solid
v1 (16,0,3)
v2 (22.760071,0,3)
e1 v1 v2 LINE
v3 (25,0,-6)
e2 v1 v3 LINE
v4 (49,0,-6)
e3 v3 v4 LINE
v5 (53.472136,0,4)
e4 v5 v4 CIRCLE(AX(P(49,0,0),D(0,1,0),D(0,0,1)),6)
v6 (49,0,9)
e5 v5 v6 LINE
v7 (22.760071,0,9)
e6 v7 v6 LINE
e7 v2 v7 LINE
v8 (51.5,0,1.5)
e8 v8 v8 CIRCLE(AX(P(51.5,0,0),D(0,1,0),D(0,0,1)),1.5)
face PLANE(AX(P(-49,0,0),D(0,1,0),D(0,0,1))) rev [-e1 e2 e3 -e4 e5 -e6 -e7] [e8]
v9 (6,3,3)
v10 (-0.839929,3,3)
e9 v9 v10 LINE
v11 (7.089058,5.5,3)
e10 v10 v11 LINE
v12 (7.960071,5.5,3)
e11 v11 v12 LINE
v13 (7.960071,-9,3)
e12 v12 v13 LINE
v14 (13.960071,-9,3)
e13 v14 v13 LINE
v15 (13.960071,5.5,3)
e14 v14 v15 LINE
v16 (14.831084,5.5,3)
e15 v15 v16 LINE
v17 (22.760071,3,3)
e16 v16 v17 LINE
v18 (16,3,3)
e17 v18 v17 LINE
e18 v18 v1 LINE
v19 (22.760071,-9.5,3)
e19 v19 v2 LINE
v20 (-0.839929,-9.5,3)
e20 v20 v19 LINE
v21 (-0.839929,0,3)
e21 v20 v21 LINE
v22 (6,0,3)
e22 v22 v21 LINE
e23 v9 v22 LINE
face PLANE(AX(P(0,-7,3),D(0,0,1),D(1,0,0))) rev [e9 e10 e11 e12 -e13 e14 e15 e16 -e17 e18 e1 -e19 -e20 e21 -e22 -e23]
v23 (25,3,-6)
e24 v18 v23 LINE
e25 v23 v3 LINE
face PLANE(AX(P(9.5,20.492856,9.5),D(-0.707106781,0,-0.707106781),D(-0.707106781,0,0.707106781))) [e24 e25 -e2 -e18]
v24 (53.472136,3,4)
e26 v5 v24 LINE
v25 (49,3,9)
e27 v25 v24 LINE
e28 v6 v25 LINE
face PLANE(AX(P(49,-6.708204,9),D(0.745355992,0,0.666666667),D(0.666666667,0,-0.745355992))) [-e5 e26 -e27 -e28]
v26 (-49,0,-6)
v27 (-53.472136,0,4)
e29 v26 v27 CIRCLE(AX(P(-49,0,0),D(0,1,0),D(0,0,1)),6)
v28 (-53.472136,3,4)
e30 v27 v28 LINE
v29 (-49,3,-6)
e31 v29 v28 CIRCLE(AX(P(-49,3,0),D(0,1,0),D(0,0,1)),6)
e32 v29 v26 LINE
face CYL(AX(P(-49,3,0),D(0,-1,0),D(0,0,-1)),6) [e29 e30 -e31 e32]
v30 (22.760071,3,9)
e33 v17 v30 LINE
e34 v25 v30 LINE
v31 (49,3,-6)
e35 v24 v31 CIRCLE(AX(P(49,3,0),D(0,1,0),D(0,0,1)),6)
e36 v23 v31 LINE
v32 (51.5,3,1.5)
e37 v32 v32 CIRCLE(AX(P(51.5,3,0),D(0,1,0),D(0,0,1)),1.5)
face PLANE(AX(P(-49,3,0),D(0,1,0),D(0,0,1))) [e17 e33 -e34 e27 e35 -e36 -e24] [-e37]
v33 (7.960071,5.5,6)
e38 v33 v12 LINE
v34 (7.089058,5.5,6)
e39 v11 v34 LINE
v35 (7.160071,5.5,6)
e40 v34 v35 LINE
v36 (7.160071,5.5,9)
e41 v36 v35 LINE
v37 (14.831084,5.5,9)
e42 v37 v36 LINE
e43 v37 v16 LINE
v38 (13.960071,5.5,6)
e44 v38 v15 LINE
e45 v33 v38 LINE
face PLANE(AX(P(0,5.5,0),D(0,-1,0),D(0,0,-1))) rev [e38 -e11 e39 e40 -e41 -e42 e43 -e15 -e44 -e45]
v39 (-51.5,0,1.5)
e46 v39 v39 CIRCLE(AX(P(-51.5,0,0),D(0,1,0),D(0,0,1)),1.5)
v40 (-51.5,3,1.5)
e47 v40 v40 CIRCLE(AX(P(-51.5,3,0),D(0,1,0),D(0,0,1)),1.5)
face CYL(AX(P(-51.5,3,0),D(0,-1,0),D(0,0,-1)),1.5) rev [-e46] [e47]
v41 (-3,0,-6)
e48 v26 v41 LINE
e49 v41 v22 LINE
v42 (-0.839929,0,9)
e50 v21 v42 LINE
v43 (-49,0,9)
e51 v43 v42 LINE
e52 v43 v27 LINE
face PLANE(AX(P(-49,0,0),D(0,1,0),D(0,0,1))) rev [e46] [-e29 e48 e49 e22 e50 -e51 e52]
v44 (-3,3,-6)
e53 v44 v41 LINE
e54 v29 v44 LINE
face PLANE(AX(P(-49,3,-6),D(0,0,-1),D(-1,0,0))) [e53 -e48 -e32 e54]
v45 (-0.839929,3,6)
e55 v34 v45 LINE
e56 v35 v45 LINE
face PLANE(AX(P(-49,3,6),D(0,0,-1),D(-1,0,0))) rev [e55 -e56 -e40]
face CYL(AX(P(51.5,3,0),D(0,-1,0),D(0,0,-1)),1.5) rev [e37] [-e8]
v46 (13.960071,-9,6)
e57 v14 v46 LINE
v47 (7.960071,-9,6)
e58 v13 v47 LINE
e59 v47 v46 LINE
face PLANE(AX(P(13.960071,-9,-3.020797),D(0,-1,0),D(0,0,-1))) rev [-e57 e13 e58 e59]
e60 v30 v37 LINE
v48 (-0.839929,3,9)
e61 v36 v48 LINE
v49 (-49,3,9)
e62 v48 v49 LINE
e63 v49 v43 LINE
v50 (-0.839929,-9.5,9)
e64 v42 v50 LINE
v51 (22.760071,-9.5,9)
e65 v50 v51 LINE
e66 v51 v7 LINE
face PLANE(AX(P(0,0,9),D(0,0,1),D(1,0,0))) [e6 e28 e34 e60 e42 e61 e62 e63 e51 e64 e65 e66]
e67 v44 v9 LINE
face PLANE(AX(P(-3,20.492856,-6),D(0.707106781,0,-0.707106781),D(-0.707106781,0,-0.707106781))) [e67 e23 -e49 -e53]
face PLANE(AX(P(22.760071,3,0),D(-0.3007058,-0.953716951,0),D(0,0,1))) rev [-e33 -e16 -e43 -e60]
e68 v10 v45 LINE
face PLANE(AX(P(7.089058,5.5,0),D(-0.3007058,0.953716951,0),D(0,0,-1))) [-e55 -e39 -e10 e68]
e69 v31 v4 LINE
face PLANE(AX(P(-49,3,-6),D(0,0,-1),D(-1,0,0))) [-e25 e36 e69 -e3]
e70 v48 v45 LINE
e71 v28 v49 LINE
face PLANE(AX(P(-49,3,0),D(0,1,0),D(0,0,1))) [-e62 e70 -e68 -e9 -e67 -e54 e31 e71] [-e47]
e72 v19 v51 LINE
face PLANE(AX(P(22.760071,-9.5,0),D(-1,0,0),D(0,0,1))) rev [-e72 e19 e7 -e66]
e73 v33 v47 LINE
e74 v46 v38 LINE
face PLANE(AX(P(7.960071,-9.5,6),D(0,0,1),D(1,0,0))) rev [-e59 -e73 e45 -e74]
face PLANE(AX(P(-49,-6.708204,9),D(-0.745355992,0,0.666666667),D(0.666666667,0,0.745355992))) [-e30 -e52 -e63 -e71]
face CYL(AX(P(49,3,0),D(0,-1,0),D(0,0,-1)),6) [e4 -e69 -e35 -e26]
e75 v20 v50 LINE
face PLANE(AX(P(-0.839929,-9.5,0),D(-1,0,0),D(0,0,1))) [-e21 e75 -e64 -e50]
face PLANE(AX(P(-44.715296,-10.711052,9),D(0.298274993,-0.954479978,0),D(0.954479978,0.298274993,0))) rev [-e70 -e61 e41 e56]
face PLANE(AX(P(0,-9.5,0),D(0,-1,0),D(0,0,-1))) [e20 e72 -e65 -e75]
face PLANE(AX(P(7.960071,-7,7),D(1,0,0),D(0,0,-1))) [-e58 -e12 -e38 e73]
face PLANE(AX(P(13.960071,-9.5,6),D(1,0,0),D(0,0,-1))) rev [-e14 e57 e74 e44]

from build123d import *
from OCP.BRepFilletAPI import BRepFilletAPI_MakeChamfer

# Parameters (mm, degrees)
SKETCH1_R           = 1.5
BOSS_EXTRUDE1_DEPTH = 3
CUT_EXTRUDE1_DEPTH  = 10
CUT_EXTRUDE3_START  = -3
SKETCH8_W           = 6
SKETCH8_H           = 3
CUT_EXTRUDE3_DEPTH  = 4
BOSS_EXTRUDE4_START = 2.5
BOSS_EXTRUDE4_DEPTH = 15
BOSS_EXTRUDE5_DEPTH = 3
BOSS_EXTRUDE6_START = 2.5
SKETCH11_W          = 8
SKETCH11_H          = 3
BOSS_EXTRUDE6_DEPTH = 15
CHAMFER1_SIZE       = 7.928987006
CHAMFER1_SIZE_2     = 2.5
SKETCH12_W          = 6
SKETCH12_H          = 0.5
BOSS_EXTRUDE7_DEPTH = 3
BOSS_EXTRUDE8_START = 6
BOSS_EXTRUDE8_DEPTH = 3
BOSS_EXTRUDE9_DEPTH = 3


with BuildPart() as part:
    # Sketch1 → Boss-Extrude1 (new body)
    with BuildSketch(Plane(origin=(0, 0, 0), x_dir=(1, 0, 0), z_dir=(0, 1, 0))):
        with BuildLine():
            Line((-49, 6), (49, 6))
            ThreePointArc((49, 6), (55, 0), (49, -6))
            Line((49, -6), (-49, -6))
            ThreePointArc((-49, -6), (-55, 0), (-49, 6))
        make_face()
        with Locations(Location((-51.5, 0, 0), (0, 0, 270))):
            Circle(SKETCH1_R, mode=Mode.SUBTRACT)
        with Locations(Location((51.5, 0, 0), (0, 0, 270))):
            Circle(SKETCH1_R, mode=Mode.SUBTRACT)
    extrude(amount=BOSS_EXTRUDE1_DEPTH)

    # Sketch2 → Cut-Extrude1 (cut)
    with BuildSketch(Plane(origin=(0, 3, 0), x_dir=(1, 0, 0), z_dir=(0, 1, 0))):
        Polygon((-9, 6), (0, -3), (22, -3), (31, 6), align=None)
    extrude(amount=-CUT_EXTRUDE1_DEPTH, mode=Mode.SUBTRACT)

    # Sketch8 → Cut-Extrude3 (cut)
    with BuildSketch(Plane.XY.offset(6).offset(CUT_EXTRUDE3_START)):
        with Locations((10.960071178, 1.5)):
            Rectangle(SKETCH8_W, SKETCH8_H)
    extrude(amount=CUT_EXTRUDE3_DEPTH, mode=Mode.SUBTRACT)


with BuildPart() as cut_extrude3_piece_1:
    # of the separate pieces the step leaves, piece 1, a body of its own (cut_extrude3_pieces)
    add(part.part.solids().sort_by_distance((-49, 0, -6))[0])

    # Sketch9 → Boss-Extrude4 (add)
    with BuildSketch(Plane(origin=(0, 3, 0), x_dir=(1, 0, 0), z_dir=(0, 1, 0)).offset(BOSS_EXTRUDE4_START)):
        Polygon((13.960071178, -6), (13.960071178, -3), (14.760071178, -3), (14.760071178, -6.8), (7.160071178, -6.8), (7.160071178, -3), (7.960071178, -3), (7.960071178, -6), align=None)
    extrude(amount=-BOSS_EXTRUDE4_DEPTH)



with BuildPart() as cut_extrude3_piece_2:
    # of the separate pieces the step leaves, piece 2, a body of its own (cut_extrude3_pieces)
    add(part.part.solids().sort_by_distance((49, 0, 6))[0])


with BuildPart() as cut_extrude3_piece_1_1:
    add(cut_extrude3_piece_1.part)

    add(cut_extrude3_piece_2.part)  # Boss-Extrude5 merges Cut-Extrude3 piece 2
    # Sketch10 → Boss-Extrude5 (add)
    with BuildSketch(Plane(origin=(0, 0, 0), x_dir=(1, 0, 0), z_dir=(0, 1, 0))):
        Polygon((22, -3), (16, -3), (25, 6), (31, 6), align=None)
        Polygon((0, -3), (6, -3), (-3, 6), (-9, 6), align=None)
    extrude(amount=BOSS_EXTRUDE5_DEPTH)

    # Sketch11 → Boss-Extrude6 (add)
    with BuildSketch(Plane(origin=(0, 3, 0), x_dir=(1, 0, 0), z_dir=(0, 1, 0)).offset(BOSS_EXTRUDE6_START)):
        with Locations((3.160071178, -4.5)):
            Rectangle(SKETCH11_W, SKETCH11_H)
        Polygon((16, -3), (14.760071178, -3), (14.760071178, -6), (22.760071178, -6), (22.760071178, -3), align=None)
    extrude(amount=-BOSS_EXTRUDE6_DEPTH)

    # Chamfer1
    chamfer1_edges_1 = [cut_extrude3_piece_1_1.edges().sort_by_distance(p)[0] for p in [
        (-0.839928822, 5.5, 4.5),
    ]]
    chamfer1_side_1 = [cut_extrude3_piece_1_1.faces().sort_by_distance(p)[0] for p in [
        (-0.789928822, 5.5, 4.5),
    ]]
    chamfer1_edges_2 = [cut_extrude3_piece_1_1.edges().sort_by_distance(p)[0] for p in [
        (22.760071178, 5.5, 4.5),
    ]]
    chamfer1_side_2 = [cut_extrude3_piece_1_1.faces().sort_by_distance(p)[0] for p in [
        (22.760071178, 5.45, 4.5),
    ]]
    chamfer1 = BRepFilletAPI_MakeChamfer(cut_extrude3_piece_1_1.part.solid().wrapped)
    for e in chamfer1_edges_1:
        chamfer1.Add(CHAMFER1_SIZE - 0.0001, CHAMFER1_SIZE_2 - 0.0001, e.wrapped, chamfer1_side_1[0].wrapped)
    for e in chamfer1_edges_2:
        chamfer1.Add(CHAMFER1_SIZE_2 - 0.0001, CHAMFER1_SIZE - 0.0001, e.wrapped, chamfer1_side_2[0].wrapped)
    add(Compound.cast(chamfer1.Shape()), mode=Mode.REPLACE)  # a hair under: the kernel refuses the full size

    # Sketch12 → Boss-Extrude7 (add)
    with BuildSketch(Plane(origin=(0, 0, 6), x_dir=(-1, 0, 0), z_dir=(0, 0, -1))):
        with Locations((-10.960071178, -9.25)):
            Rectangle(SKETCH12_W, SKETCH12_H)
    extrude(amount=BOSS_EXTRUDE7_DEPTH)

    # Sketch13 → Boss-Extrude8 (add)
    with BuildSketch(Plane.XY.offset(BOSS_EXTRUDE8_START)):
        Polygon((7.160071178, 5.5), (-0.839928822, 3), (-49, 3), (-49, 0), (-0.839928822, 0), (-0.839928822, -9.5), (7.160071178, -9.5), (14.760071178, -9.5), (22.760071178, -9.5), (22.760071178, 0), (49, 0), (49, 3), (22.760071178, 3), (14.831084172, 5.5), (14.760071178, 5.5), align=None)
    extrude(amount=BOSS_EXTRUDE8_DEPTH)

    # Sketch14 → Boss-Extrude9 (add)
    with BuildSketch(Plane(origin=(0, 3, 0), x_dir=(1, 0, 0), z_dir=(0, 1, 0))):
        with BuildLine():
            Line((-49, -9), (-53.472135955, -4))
            ThreePointArc((-53.472135955, -4), (-51.449489743, -5.477225575), (-49, -6))
            Line((-49, -6), (-49, -9))
        make_face()
        with BuildLine():
            Line((49, -9), (53.472135955, -4))
            ThreePointArc((53.472135955, -4), (51.449489743, -5.477225575), (49, -6))
            Line((49, -6), (49, -9))
        make_face()
    extrude(amount=-BOSS_EXTRUDE9_DEPTH)


solid = cut_extrude3_piece_1_1.part
